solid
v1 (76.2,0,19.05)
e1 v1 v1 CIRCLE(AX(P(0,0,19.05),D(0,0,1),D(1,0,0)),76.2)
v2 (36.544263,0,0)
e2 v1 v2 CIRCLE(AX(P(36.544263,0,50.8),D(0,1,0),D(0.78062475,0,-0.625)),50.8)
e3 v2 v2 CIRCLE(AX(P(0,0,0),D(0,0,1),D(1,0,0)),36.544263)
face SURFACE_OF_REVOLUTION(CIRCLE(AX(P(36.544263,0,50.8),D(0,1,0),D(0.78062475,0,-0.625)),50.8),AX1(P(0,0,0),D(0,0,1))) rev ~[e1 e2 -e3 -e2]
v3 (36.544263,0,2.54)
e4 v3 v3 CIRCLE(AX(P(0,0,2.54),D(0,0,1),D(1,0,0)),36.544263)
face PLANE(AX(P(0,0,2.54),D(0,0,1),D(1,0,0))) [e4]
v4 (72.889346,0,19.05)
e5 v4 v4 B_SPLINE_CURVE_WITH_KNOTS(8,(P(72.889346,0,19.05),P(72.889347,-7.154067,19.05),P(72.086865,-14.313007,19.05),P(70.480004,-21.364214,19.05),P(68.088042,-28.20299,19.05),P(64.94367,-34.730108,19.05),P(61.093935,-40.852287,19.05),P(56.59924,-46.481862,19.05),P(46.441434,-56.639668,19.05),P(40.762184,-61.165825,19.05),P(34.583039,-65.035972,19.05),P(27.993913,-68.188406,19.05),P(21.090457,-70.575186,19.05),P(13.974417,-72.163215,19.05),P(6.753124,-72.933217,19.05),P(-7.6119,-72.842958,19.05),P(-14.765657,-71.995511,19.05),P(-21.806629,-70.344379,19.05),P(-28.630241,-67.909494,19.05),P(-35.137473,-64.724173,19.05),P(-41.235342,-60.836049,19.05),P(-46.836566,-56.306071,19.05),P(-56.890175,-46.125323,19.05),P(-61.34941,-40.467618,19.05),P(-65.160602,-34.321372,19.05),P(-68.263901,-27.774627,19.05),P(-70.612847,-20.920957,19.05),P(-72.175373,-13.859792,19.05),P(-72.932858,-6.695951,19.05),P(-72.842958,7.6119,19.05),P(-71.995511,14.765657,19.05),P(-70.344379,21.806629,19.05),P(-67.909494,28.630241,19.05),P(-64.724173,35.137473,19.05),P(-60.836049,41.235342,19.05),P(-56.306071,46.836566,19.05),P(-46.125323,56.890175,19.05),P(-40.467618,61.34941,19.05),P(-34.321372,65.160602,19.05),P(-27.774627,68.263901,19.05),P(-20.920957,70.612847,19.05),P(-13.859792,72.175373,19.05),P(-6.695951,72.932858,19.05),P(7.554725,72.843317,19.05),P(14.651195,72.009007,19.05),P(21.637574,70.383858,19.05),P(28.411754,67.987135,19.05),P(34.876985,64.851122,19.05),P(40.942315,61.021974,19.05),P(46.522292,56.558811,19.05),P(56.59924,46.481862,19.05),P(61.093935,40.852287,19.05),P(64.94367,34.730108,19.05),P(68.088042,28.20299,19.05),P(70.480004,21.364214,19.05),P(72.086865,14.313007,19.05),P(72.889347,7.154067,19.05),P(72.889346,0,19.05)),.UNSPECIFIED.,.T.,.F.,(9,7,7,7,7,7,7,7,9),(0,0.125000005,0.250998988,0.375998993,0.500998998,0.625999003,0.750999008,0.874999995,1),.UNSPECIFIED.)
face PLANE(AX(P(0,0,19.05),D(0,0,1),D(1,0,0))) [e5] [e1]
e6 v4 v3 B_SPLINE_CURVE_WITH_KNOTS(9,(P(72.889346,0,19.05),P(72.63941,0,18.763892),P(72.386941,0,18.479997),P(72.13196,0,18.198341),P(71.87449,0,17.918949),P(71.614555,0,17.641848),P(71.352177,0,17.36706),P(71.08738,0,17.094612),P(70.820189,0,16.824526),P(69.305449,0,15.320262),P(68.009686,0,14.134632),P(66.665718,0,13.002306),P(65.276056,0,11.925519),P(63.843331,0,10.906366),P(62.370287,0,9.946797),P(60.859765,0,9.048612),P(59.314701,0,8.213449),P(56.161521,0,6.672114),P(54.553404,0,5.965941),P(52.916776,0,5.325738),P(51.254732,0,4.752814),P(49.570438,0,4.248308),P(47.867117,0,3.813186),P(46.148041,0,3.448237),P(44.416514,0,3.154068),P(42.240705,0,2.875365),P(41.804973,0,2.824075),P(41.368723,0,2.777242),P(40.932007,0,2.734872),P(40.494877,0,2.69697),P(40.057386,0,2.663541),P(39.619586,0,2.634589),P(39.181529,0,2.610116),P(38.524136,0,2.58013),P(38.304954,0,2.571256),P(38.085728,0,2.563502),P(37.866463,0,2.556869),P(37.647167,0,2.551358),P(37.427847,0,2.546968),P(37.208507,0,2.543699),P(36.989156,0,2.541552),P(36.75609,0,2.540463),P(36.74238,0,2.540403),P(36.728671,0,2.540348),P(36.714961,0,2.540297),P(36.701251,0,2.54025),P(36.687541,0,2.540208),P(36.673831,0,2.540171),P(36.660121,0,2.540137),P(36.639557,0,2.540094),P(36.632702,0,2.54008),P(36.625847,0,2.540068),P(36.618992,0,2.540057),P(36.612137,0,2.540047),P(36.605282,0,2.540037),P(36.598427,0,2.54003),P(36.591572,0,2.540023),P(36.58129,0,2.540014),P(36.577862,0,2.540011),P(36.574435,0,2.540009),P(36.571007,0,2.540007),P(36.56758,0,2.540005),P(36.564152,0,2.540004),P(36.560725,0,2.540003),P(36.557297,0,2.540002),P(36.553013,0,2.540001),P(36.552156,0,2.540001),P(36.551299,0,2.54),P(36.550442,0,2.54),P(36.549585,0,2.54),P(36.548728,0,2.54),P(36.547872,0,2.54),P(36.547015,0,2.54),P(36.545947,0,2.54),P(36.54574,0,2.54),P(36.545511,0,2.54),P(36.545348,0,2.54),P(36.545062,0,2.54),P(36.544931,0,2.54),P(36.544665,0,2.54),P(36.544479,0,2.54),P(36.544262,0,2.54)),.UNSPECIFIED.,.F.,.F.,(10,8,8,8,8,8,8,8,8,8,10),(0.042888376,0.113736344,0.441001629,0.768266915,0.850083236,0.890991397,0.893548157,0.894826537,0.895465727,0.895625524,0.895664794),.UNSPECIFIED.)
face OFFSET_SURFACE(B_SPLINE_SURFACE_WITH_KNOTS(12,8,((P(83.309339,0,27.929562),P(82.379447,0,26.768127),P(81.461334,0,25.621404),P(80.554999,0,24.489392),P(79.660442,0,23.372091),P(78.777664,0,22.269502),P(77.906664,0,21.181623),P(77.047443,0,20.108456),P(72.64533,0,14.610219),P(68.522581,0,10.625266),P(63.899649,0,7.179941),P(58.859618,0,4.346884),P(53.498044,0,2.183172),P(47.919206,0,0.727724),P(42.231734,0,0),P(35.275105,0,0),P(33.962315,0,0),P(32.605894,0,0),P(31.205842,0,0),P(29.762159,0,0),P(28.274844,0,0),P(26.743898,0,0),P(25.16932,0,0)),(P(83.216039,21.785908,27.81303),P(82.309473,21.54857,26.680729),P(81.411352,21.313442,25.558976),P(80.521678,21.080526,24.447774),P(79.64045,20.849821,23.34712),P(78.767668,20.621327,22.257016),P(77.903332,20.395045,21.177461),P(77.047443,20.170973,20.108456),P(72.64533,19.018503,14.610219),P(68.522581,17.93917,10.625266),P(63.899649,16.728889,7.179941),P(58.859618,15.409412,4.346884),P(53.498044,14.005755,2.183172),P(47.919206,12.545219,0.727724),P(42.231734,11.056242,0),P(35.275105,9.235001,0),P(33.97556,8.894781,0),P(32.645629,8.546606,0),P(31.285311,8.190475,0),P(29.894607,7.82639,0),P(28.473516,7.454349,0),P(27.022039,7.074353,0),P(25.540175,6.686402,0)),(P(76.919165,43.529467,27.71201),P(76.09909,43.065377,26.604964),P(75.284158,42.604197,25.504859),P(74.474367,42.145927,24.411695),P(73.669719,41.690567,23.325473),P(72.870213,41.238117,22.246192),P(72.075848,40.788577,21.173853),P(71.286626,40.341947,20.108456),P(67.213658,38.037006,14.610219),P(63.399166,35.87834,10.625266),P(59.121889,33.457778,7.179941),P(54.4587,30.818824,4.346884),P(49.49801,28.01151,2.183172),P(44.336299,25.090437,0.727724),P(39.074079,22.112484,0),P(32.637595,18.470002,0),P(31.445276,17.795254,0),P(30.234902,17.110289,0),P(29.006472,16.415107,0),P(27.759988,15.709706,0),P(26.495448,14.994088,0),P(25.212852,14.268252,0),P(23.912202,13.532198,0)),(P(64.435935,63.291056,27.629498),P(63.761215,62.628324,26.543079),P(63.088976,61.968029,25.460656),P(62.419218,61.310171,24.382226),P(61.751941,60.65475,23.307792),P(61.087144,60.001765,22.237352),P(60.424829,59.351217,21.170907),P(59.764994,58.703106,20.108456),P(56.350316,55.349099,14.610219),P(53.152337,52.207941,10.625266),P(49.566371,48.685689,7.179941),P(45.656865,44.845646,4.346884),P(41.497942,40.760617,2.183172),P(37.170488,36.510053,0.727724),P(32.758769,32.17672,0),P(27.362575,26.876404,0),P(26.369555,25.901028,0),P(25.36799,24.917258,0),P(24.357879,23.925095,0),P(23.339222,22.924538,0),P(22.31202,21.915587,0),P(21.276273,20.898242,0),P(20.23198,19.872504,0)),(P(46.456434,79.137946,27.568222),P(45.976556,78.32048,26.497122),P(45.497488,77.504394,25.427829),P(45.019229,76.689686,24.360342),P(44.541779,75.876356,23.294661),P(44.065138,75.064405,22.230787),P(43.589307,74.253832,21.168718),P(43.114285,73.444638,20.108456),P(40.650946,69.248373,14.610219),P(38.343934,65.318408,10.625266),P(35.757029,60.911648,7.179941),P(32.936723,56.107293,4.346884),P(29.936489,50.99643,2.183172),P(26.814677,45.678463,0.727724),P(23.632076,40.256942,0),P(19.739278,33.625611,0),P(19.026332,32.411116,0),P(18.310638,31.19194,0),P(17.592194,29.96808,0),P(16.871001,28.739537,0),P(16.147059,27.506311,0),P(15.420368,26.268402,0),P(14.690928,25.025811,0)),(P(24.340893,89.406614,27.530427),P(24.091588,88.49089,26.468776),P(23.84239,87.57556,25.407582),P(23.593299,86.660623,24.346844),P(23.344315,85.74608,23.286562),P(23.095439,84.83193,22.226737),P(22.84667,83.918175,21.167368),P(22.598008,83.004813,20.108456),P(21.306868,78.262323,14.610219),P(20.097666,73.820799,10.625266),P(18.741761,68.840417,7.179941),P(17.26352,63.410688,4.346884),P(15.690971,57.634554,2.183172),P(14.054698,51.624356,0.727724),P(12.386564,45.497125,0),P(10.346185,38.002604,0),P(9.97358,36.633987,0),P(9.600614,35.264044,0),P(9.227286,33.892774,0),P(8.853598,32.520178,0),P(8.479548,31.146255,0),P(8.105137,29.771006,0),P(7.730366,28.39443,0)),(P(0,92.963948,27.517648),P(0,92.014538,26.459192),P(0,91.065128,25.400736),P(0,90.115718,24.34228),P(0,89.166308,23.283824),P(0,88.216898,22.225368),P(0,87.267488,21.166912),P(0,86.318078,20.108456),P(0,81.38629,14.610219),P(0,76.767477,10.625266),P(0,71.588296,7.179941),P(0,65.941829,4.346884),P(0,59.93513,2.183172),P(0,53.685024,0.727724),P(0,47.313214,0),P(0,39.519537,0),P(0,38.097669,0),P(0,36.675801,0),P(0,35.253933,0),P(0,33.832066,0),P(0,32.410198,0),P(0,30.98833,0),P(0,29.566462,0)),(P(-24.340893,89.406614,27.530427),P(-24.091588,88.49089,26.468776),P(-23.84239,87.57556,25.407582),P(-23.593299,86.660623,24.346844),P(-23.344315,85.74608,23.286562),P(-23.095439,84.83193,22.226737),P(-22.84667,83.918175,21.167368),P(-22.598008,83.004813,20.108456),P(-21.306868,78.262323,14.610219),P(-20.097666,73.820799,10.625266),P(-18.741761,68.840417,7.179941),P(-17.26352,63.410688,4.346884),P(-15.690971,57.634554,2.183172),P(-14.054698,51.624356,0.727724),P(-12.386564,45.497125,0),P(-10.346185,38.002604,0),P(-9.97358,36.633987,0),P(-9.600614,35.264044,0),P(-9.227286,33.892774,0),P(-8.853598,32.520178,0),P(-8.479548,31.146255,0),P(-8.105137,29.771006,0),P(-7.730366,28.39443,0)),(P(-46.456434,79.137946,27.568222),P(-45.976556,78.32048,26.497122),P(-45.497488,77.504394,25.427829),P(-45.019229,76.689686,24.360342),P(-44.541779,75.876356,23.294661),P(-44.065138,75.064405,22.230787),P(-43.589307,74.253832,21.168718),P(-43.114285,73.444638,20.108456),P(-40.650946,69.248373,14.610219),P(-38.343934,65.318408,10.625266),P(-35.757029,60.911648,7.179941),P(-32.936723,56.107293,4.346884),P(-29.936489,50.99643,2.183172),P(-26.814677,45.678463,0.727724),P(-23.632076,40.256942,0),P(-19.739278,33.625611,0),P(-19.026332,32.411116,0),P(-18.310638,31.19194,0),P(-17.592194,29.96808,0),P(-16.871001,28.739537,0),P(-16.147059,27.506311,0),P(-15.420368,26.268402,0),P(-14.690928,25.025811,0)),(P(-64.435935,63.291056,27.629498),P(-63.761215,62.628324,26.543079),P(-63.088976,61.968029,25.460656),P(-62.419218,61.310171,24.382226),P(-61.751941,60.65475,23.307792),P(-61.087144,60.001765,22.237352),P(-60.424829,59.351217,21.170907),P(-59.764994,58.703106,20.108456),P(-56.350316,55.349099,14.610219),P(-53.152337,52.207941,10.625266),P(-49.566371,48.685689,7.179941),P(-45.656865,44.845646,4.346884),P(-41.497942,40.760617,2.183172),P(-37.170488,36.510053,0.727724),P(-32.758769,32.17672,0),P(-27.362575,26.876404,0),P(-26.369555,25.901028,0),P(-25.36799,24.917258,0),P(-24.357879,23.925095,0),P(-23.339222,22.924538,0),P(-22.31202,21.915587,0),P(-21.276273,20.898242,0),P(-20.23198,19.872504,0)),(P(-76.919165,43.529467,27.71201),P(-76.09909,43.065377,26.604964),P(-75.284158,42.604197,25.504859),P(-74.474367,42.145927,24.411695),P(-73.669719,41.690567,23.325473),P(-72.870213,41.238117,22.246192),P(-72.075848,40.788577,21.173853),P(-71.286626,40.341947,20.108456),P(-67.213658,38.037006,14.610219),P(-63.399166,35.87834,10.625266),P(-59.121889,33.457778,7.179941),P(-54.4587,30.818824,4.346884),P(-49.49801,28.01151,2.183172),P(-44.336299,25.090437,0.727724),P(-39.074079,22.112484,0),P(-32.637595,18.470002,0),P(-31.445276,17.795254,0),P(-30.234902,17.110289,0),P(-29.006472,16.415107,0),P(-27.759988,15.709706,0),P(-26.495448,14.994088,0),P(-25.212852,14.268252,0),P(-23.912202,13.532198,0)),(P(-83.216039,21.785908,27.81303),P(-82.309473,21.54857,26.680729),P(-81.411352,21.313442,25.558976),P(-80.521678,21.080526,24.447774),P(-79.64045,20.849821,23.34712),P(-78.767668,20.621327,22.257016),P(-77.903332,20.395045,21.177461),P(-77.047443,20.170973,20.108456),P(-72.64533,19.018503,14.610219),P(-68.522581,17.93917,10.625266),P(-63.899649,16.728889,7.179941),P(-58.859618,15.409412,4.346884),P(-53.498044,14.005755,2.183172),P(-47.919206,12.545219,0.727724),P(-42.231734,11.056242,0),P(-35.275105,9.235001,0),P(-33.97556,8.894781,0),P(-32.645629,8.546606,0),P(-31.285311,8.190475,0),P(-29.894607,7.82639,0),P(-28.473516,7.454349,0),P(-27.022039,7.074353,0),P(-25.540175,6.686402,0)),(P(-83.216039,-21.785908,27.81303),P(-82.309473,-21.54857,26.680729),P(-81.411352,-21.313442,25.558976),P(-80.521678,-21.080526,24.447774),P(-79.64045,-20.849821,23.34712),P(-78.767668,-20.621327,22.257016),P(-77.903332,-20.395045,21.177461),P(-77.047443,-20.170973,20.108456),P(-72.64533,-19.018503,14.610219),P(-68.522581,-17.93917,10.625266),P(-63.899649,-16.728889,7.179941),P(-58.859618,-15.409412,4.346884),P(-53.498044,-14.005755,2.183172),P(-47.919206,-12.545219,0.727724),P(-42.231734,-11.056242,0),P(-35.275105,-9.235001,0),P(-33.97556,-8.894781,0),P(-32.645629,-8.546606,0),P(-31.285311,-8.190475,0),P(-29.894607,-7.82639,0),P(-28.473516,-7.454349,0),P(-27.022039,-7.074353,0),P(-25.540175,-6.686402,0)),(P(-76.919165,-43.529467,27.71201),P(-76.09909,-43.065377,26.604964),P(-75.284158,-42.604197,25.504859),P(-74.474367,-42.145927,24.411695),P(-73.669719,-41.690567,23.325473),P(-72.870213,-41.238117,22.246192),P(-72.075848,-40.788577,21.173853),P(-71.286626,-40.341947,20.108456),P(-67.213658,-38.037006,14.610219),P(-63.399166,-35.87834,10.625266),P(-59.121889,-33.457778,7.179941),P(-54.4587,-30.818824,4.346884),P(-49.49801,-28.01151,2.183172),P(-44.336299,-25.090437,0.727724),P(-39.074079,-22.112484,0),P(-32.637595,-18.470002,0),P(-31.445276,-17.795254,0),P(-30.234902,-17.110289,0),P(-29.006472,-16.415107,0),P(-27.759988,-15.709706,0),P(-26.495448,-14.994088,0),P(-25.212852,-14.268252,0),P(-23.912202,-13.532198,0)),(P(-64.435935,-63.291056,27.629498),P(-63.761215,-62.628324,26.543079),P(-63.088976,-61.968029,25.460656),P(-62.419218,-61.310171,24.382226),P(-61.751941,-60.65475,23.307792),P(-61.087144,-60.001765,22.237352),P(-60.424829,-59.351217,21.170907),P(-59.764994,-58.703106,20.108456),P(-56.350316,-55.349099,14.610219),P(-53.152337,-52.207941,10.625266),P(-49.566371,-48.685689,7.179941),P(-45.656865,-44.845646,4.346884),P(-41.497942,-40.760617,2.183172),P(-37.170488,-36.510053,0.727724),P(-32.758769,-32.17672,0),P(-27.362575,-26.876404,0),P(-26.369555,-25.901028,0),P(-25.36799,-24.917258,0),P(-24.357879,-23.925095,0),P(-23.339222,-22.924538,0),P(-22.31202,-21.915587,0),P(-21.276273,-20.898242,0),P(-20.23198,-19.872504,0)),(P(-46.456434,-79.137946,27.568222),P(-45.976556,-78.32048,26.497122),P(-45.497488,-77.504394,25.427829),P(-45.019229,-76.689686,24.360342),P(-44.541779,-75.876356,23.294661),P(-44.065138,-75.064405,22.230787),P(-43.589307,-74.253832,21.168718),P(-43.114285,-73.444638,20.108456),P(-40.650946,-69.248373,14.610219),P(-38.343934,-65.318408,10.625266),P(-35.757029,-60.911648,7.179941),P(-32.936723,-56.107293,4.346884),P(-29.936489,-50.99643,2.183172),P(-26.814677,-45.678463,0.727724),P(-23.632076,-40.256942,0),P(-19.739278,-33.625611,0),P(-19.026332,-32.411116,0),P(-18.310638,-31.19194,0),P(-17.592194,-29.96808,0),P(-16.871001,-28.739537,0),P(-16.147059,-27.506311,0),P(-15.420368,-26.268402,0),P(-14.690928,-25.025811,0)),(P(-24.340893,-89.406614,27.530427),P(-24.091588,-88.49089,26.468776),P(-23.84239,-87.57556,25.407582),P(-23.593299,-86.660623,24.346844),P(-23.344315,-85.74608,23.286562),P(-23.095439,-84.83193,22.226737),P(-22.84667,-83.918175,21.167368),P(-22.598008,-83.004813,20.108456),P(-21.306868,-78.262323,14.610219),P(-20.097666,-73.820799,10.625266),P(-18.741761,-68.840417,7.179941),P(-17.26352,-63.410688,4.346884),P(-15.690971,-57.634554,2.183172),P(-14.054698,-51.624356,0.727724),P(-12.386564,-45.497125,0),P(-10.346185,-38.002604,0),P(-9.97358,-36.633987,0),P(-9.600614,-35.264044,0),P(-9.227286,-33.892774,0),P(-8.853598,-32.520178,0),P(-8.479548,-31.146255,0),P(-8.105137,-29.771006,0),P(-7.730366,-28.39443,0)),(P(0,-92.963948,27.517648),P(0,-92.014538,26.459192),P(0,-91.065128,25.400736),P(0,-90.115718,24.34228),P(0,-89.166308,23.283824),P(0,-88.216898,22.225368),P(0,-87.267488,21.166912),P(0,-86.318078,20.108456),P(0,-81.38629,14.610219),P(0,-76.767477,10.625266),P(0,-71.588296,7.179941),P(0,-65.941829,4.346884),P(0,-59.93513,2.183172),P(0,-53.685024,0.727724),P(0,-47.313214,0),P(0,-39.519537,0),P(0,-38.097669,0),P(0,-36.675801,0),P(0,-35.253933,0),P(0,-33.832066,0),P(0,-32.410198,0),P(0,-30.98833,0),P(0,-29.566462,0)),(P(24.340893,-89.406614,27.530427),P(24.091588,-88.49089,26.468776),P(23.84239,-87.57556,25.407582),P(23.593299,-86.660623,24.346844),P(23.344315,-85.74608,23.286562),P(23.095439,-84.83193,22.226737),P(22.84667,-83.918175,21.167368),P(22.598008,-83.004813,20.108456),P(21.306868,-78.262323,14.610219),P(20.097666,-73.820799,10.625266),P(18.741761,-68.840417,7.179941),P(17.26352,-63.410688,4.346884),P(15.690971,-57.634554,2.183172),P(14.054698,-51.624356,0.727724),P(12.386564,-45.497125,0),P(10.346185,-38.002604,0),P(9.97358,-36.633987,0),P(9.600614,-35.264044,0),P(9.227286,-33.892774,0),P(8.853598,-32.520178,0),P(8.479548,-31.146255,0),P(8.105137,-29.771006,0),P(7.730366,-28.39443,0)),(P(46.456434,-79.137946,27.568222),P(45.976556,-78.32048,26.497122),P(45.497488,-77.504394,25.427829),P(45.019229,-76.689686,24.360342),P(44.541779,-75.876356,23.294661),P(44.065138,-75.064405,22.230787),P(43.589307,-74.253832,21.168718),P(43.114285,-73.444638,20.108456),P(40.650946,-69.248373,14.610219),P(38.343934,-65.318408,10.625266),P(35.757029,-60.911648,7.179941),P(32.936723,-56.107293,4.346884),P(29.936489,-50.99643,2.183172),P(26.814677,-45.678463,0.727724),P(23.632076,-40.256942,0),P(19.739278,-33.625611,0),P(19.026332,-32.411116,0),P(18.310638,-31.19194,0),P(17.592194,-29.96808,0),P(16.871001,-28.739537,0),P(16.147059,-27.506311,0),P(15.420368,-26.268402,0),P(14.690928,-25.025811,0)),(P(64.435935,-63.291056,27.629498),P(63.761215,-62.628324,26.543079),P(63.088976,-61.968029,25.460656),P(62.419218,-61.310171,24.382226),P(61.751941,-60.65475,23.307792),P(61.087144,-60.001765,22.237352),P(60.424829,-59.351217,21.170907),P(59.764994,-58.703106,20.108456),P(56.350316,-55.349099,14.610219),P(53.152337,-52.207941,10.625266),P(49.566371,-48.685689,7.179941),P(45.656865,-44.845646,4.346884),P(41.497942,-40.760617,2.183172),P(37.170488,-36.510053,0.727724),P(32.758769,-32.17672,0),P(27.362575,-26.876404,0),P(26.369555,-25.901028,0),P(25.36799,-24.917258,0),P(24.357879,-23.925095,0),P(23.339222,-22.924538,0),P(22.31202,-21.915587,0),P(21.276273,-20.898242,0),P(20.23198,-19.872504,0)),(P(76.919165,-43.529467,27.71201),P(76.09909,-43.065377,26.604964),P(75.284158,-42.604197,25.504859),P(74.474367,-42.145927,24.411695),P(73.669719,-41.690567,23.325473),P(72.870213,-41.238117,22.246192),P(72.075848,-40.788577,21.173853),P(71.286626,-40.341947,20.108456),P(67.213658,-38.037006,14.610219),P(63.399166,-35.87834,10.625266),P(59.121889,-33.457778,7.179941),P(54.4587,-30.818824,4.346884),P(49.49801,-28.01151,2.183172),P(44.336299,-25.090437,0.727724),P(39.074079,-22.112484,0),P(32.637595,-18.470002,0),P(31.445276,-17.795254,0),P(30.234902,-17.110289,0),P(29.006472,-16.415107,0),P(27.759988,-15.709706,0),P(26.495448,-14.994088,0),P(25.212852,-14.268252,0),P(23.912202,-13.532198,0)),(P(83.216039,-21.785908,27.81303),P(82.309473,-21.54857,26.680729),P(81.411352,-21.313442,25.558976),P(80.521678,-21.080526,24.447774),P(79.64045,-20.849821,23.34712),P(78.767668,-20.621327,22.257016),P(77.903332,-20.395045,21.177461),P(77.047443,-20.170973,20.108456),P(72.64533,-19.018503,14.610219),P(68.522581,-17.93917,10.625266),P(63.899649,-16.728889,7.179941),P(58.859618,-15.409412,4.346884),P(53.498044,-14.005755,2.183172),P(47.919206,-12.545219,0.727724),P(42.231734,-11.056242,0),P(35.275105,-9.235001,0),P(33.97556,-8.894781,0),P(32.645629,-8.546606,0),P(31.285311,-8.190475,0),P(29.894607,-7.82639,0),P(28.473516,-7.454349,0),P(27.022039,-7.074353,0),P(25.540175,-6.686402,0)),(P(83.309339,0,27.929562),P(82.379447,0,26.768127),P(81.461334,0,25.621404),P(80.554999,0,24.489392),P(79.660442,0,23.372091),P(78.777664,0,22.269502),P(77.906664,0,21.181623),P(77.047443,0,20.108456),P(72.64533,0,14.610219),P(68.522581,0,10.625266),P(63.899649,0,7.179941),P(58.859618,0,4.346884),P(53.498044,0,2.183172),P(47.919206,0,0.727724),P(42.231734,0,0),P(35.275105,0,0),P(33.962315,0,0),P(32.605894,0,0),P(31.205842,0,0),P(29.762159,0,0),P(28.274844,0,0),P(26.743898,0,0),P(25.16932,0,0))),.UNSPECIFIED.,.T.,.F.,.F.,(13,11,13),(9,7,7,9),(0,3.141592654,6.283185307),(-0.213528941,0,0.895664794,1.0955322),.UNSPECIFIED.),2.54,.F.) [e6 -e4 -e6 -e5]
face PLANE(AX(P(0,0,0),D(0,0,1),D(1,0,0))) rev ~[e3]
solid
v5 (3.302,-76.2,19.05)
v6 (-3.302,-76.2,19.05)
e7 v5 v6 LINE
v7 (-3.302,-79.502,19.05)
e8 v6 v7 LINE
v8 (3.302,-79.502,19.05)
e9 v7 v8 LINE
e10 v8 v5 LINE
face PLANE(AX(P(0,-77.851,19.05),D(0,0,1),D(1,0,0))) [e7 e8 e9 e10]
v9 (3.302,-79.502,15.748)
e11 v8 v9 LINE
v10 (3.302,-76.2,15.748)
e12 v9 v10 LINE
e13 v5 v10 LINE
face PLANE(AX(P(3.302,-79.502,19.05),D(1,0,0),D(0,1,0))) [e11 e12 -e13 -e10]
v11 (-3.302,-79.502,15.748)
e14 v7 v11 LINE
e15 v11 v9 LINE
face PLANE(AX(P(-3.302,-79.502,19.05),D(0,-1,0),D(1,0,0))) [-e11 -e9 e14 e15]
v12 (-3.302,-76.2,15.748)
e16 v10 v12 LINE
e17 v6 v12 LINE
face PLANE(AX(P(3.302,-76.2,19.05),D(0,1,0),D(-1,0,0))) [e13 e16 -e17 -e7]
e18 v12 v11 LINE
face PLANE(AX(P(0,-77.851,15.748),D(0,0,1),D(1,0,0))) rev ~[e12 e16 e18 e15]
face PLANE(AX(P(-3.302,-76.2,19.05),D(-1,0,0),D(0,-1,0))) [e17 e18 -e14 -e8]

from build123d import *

# Parameters (mm, degrees)
F0_R     = 76.2
F1_DEPTH = 19.05
F3_T     = -2.54
F5_DEPTH = 3.302


# Not quite as in the source:
# - a fillet or chamfer that OpenCascade refuses, or shapes differently, is made with other operations: its cross-section is extruded or revolved along the edge and cut away or added
# - a feature names something its author has since deleted; it is built from what else it names


with BuildPart() as f1:
    # F0 (on Top) → F1 (new body)
    with BuildSketch(Plane.XY):
        Circle(F0_R)
    extrude(amount=F1_DEPTH)

    # F2: fillet of radius 50.8 on 1 edges, made by hand

    # F2_s1 → F2_t2 (revolve, cut)
    with BuildSketch(Plane.XZ):
        with BuildLine():
            ThreePointArc((76.2, 19.05), (58.5413079663, 5.0094988016), (36.5442627102, 0))
            Line((36.5442627102, 0), (76.2, 0))
            Line((76.2, 0), (76.2, 19.05))
        make_face()
    revolve(axis=Axis((0, 0, 0), (0, 0, 1)), mode=Mode.SUBTRACT)

    # F3
    f3_openings = [f1.faces().sort_by_distance(p)[0] for p in [
        (0, 0, 19.05),
    ]]
    offset(amount=F3_T, openings=f3_openings)


with BuildPart() as f5:
    # F4 (on face) → F5 (new body)
    with BuildSketch(Plane.XY.offset(19.05)):
        Polygon((3.302, -76.2), (0, -76.2), (-3.302, -76.2), (-3.302, -79.502), (3.302, -79.502), align=None)
    extrude(amount=-F5_DEPTH)


solid = Compound([f1.part, f5.part])
